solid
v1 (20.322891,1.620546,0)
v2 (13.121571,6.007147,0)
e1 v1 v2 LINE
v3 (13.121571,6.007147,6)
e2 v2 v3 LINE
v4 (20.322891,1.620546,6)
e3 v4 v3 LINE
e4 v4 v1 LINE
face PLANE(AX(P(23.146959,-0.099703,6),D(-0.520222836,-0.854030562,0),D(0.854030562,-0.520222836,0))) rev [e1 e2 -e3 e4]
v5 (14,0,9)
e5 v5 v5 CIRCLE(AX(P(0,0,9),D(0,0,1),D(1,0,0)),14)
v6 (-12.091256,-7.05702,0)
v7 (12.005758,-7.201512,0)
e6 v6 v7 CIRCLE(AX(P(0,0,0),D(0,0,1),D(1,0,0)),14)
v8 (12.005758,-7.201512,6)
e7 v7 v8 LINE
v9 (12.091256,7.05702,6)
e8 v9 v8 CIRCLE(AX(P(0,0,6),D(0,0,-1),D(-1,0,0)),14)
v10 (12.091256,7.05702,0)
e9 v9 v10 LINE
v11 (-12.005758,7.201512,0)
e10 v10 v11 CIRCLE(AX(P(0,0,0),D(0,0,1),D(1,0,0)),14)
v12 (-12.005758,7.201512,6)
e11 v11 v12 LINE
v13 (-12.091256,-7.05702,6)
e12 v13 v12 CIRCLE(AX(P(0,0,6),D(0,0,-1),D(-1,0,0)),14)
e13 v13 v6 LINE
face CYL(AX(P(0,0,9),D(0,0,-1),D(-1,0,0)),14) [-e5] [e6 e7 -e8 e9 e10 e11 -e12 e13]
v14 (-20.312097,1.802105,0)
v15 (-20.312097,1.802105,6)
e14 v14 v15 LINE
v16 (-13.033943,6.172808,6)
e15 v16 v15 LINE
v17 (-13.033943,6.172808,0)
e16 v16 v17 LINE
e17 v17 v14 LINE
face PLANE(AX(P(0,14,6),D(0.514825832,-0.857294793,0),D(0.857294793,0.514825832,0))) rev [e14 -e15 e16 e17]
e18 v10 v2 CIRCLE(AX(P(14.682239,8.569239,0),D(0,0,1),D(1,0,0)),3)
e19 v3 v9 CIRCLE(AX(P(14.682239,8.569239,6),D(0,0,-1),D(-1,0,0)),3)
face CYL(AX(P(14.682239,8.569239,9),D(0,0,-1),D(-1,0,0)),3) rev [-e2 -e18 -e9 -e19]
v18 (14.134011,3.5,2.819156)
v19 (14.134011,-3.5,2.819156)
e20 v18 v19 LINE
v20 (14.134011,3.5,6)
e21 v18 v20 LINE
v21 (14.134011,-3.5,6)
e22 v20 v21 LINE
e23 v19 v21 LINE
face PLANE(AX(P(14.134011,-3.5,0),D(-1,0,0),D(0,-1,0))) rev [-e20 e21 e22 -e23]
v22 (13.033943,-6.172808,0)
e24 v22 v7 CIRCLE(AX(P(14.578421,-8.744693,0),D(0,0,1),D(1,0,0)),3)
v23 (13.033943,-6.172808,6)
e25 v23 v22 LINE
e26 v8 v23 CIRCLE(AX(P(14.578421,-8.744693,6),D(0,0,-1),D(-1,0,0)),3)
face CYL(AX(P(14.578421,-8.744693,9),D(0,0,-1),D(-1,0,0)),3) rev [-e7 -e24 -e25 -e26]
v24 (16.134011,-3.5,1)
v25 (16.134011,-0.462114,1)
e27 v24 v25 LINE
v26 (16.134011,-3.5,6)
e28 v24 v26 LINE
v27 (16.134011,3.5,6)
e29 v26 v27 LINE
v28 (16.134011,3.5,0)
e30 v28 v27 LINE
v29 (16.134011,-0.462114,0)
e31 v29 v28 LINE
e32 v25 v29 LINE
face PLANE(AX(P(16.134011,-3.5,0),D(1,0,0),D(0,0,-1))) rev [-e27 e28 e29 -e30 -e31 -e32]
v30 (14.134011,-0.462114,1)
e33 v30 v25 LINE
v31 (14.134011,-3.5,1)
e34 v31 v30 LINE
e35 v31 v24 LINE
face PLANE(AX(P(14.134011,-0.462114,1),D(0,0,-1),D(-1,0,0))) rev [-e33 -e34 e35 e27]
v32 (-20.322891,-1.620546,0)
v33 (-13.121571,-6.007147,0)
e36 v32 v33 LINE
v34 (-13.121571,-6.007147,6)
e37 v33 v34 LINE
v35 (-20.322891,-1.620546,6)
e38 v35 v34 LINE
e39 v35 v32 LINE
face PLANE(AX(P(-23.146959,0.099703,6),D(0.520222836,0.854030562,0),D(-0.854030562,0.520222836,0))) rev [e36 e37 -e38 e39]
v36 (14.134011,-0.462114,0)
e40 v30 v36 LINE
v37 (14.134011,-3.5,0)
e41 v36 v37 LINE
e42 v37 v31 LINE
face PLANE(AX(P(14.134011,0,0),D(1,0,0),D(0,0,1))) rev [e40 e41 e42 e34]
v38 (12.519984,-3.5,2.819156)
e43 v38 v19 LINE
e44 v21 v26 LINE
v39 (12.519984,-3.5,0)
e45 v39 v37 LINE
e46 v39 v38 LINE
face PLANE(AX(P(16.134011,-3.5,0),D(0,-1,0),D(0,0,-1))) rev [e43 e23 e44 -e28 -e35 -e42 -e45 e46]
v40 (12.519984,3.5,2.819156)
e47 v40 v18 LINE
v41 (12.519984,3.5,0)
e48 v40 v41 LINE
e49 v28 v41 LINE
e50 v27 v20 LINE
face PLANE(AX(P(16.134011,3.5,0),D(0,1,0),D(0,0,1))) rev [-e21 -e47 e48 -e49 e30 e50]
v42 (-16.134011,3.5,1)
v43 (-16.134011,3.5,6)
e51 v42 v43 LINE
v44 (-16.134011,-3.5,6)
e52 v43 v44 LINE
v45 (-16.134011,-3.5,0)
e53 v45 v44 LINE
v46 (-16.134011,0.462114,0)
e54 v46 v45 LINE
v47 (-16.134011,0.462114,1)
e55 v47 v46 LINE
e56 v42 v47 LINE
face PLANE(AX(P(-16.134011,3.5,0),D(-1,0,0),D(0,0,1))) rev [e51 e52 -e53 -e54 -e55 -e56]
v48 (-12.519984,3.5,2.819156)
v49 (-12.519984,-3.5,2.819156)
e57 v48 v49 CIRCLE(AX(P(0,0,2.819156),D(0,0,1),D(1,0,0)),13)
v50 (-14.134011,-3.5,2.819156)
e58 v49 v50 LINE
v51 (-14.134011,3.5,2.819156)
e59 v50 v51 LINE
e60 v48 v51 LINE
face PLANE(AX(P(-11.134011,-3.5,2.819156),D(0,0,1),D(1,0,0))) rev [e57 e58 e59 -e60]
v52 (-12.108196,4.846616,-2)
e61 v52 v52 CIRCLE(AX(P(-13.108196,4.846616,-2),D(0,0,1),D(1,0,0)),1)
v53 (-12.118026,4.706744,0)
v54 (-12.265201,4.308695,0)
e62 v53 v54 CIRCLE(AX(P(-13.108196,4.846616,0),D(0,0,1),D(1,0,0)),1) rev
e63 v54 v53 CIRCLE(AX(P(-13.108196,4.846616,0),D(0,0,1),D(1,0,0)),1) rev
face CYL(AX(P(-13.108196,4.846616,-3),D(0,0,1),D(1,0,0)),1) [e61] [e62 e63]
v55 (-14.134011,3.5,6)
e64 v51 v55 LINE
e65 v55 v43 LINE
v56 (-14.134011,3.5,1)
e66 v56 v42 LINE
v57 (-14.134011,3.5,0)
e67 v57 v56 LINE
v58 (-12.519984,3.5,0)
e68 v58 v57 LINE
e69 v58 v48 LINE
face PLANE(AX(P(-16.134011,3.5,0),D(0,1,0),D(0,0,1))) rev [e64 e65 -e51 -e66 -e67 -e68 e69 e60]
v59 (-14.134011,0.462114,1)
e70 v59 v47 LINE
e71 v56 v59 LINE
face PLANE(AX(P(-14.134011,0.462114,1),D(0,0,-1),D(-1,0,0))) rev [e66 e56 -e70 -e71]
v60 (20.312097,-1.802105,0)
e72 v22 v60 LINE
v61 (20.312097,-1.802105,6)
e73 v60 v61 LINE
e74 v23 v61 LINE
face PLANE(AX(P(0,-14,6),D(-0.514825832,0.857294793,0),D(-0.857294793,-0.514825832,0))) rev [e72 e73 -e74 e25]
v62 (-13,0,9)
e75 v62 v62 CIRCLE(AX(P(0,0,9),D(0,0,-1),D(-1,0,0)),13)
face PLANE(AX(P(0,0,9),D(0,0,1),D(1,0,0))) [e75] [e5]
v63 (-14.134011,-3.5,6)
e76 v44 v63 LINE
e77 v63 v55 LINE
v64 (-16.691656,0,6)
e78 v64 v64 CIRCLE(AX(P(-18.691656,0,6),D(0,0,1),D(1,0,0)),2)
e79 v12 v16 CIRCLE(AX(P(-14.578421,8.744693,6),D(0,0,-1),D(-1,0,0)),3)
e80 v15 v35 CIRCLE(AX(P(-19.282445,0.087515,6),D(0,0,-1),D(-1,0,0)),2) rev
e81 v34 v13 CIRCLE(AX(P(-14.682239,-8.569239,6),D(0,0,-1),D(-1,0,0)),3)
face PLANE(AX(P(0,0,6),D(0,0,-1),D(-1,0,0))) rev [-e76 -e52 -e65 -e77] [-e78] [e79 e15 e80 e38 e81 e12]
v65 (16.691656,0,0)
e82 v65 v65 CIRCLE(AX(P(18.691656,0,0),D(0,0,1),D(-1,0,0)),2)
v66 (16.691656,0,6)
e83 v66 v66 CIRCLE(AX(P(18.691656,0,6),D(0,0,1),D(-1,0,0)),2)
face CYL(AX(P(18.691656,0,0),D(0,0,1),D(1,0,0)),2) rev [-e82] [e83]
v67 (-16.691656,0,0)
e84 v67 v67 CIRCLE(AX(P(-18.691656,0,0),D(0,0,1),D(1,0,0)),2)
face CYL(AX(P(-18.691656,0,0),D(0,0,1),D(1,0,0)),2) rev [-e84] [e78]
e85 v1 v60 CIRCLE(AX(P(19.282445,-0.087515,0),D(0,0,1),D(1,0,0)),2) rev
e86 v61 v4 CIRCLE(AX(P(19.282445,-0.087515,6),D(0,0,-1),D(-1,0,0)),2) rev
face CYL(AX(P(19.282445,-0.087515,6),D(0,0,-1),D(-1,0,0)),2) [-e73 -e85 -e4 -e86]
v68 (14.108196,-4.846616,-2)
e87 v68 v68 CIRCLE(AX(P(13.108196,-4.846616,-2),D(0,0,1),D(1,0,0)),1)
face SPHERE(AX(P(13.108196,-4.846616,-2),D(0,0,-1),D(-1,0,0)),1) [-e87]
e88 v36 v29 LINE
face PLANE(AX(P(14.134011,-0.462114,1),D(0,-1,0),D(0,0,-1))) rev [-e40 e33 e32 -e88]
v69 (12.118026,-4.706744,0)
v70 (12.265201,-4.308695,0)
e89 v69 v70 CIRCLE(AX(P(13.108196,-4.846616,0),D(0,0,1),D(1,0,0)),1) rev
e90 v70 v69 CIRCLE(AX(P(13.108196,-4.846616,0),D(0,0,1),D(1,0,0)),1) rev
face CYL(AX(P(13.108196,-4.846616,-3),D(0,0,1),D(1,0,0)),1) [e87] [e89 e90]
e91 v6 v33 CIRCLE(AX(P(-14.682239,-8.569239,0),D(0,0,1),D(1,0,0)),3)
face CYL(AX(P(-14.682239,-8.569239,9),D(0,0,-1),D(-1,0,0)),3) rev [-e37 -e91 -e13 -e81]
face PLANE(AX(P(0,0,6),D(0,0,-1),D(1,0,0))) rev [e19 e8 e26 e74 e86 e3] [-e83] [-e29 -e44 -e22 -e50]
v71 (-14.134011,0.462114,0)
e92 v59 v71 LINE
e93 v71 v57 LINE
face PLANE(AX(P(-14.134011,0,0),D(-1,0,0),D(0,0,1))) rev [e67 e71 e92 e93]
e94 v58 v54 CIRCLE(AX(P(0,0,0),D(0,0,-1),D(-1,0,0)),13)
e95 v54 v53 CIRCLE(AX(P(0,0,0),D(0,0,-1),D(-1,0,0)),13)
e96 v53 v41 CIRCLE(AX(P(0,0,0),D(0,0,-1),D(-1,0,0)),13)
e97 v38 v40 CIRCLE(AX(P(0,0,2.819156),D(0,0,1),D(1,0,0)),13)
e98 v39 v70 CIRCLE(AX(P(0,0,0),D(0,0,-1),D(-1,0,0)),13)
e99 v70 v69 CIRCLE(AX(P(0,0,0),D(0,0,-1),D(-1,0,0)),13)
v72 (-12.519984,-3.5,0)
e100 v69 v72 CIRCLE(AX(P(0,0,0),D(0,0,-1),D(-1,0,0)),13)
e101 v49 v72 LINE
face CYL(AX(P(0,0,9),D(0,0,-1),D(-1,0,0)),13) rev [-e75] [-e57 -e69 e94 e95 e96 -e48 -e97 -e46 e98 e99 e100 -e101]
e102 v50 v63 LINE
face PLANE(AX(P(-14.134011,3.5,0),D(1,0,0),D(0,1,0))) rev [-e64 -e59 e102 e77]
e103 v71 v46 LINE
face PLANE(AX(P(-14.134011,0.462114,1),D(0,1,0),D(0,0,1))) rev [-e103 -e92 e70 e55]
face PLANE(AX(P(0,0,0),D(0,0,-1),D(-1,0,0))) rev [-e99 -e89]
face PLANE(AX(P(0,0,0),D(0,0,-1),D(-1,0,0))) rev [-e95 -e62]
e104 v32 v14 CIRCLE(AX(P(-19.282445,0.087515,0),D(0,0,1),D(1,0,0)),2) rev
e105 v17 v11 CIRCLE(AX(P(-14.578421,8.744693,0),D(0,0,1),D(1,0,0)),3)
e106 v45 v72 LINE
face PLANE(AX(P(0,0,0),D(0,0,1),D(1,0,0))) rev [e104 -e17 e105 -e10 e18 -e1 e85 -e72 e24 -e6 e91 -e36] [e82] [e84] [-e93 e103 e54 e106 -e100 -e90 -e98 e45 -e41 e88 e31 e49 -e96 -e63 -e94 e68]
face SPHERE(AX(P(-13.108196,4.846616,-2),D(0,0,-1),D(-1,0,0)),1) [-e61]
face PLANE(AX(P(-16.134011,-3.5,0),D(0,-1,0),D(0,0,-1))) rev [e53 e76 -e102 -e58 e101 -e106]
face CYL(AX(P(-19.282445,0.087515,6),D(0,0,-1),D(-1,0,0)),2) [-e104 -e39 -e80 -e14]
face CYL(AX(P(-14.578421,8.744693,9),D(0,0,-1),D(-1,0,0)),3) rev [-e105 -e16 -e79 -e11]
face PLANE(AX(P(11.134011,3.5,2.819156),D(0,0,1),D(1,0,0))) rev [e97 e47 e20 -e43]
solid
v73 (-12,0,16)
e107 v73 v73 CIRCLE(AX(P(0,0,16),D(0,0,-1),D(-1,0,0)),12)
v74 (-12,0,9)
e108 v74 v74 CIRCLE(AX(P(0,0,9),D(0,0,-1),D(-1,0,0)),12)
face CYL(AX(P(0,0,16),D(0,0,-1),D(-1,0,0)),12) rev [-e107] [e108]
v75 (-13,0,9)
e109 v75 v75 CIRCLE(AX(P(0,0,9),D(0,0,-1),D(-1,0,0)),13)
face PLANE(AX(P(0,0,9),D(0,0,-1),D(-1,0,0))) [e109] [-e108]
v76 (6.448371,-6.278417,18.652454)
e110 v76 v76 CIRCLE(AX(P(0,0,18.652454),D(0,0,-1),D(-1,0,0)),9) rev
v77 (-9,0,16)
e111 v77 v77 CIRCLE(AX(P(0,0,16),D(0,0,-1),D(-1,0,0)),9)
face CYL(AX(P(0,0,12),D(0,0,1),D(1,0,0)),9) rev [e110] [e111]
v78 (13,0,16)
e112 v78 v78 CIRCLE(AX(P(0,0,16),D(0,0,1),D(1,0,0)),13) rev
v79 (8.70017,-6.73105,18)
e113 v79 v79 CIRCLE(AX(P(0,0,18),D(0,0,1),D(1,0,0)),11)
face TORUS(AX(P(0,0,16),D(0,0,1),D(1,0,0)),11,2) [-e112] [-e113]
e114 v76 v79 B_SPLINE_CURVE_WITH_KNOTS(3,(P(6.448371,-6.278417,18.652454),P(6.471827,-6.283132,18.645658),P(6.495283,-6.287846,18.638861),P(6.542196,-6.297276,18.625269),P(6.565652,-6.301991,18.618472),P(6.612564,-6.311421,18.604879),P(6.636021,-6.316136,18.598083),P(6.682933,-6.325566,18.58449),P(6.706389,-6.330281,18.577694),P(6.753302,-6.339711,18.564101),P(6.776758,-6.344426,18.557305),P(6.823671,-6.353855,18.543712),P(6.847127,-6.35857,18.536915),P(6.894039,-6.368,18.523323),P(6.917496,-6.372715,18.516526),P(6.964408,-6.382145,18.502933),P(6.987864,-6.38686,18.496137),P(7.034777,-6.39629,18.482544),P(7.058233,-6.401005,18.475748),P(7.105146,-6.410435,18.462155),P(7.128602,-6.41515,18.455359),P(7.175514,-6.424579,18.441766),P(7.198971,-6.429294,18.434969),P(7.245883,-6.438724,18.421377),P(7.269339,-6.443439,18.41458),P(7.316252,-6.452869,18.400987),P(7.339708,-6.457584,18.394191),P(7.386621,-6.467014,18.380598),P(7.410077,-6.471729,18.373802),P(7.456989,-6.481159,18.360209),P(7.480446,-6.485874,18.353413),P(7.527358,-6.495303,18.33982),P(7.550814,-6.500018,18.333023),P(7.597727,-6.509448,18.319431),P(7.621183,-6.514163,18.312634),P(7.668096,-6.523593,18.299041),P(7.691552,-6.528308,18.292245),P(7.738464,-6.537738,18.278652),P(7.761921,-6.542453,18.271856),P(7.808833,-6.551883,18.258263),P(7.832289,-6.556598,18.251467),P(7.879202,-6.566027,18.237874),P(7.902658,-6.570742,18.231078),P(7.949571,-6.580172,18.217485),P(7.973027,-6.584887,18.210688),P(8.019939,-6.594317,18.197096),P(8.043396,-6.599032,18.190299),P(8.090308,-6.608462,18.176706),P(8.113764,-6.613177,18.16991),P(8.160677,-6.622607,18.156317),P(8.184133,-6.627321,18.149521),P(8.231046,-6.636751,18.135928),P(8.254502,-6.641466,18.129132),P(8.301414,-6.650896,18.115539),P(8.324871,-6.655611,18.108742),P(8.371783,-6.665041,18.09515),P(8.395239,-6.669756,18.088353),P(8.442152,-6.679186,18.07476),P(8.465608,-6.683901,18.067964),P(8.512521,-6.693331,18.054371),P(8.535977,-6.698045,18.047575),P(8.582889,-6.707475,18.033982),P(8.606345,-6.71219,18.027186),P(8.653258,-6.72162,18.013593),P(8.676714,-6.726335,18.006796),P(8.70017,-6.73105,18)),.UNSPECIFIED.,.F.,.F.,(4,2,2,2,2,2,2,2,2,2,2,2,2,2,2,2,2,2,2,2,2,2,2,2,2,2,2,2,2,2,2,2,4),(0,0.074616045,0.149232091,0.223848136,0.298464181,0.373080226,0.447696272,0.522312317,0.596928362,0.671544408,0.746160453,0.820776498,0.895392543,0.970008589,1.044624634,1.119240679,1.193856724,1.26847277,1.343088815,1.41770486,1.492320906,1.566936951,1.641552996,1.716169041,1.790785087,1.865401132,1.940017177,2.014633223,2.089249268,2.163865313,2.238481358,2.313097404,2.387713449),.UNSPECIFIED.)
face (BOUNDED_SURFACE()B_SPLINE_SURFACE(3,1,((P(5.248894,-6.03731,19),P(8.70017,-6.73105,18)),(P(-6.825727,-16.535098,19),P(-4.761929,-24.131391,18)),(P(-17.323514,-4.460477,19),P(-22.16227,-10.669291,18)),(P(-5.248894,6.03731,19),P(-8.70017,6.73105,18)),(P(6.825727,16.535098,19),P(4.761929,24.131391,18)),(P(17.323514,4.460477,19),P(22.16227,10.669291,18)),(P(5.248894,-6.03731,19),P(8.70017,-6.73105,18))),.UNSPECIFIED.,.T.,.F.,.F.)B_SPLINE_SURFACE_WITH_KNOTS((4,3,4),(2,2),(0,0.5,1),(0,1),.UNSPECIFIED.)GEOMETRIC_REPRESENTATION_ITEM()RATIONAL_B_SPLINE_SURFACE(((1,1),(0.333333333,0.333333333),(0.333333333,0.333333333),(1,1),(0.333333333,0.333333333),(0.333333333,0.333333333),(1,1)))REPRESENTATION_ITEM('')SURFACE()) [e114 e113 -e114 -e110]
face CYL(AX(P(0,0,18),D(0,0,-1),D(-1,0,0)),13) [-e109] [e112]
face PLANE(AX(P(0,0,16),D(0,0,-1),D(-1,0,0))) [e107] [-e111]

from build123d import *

# Parameters (mm, degrees)
SKETCH1_R                = 14
BOSS_EXTRUDE1_DEPTH      = 9
SKETCH2_R                = 13
BOSS_EXTRUDE2_DEPTH      = 9
FILLET1_R                = 2
SKETCH3_R                = 8
BOSS_EXTRUDE4_DEPTH      = 1
BOSS_EXTRUDE5_DEPTH      = 6
SKETCH6_R                = 2
CUT_EXTRUDE1_DEPTH       = 6
FILLET2_R                = 2
SKETCH7_W                = 2
SKETCH7_H                = 7
CUT_EXTRUDE2_DEPTH       = 6
SKETCH9_R                = 1
BOSS_EXTRUDE7_DEPTH      = 3
FILLET5_R                = 1
FILLET6_R                = 3
SKETCH18_W               = 3.964192534
SKETCH18_H               = 7
CUT_EXTRUDE3_DEPTH       = 3
SKETCH19_W               = 1
SKETCH19_H               = 3.03788609
BOSS_EXTRUDE8_DEPTH      = 2
CIRPATTERN2_COUNT        = 2
FILLET2_OF_CIRPATTERN2_R = 2
FILLET5_OF_CIRPATTERN2_R = 1
FILLET6_OF_CIRPATTERN2_R = 3
SKETCH10_R               = 13
CUT_EXTRUDE4_DEPTH       = 9
SKETCH20_R               = 12
CUT_EXTRUDE6_DEPTH       = 7
SKETCH17_R               = 9
CUT_EXTRUDE7_DEPTH       = 7


with BuildPart() as part:
    # Sketch1 → Boss-Extrude1 (new body)
    with BuildSketch(Plane.XY):
        Circle(SKETCH1_R)
    extrude(amount=BOSS_EXTRUDE1_DEPTH)

    # Sketch2 → Boss-Extrude2 (add)
    with BuildSketch(Plane.XY.offset(9)):
        Circle(SKETCH2_R)
    extrude(amount=BOSS_EXTRUDE2_DEPTH)

    # Fillet1
    fillet1_edges = [part.edges().sort_by_distance(p)[0] for p in [
        (-13, 0, 18),
    ]]
    fillet(fillet1_edges, radius=FILLET1_R)

    # Sketch3 → Boss-Extrude4 (add)
    with BuildSketch(Plane.XY.offset(18)):
        Circle(SKETCH3_R)
    extrude(amount=BOSS_EXTRUDE4_DEPTH)

    # Loft2: read off the stored shape, not the designer's step
    # Loft2: loft between two sections, ruled curve by curve
    loft2_from = [
        Edge.make_bspline([(5.248893728, -6.037310215, 19), (-6.825726701, -16.535097672, 19), (-17.323514158, -4.460477242, 19), (-5.248893728, 6.037310215, 19), (6.825726701, 16.535097672, 19), (17.323514158, 4.460477242, 19), (5.248893728, -6.037310215, 19)], [0, 0, 0, 0, 0.5, 0.5, 0.5, 1, 1, 1, 1], 3, [1, 0.333333333, 0.333333333, 1, 0.333333333, 0.333333333, 1]),
    ]
    loft2_to = [
        Edge.make_bspline([(8.70017049, -6.731049951, 18), (-4.761929412, -24.131390931, 18), (-22.162270392, -10.669291029, 18), (-8.70017049, 6.731049951, 18), (4.761929412, 24.131390931, 18), (22.162270392, 10.669291029, 18), (8.70017049, -6.731049951, 18)], [0, 0, 0, 0, 0.5, 0.5, 0.5, 1, 1, 1, 1], 3, [1, 0.333333333, 0.333333333, 1, 0.333333333, 0.333333333, 1]),
    ]
    loft2 = Solid(Shell([*[Face.make_surface_from_curves(loft2_from[k], loft2_to[k]) for k in range(1)], Face(Wire(loft2_from)), Face(Wire(loft2_to))]))
    add(loft2)

    # Sketch5 → Boss-Extrude5 (add)
    with BuildSketch(Plane.XY):
        Polygon((0, 14), (-23.146959422, 0.099702538), (0, -14), align=None)
    boss_extrude5 = extrude(amount=BOSS_EXTRUDE5_DEPTH)

    # Sketch6 → Cut-Extrude1 (cut)
    with BuildSketch(Plane.XY.offset(6)):
        with Locations((-18.691655648, 0)):
            Circle(SKETCH6_R)
    cut_extrude1 = extrude(amount=-CUT_EXTRUDE1_DEPTH, mode=Mode.SUBTRACT)

    # Fillet2
    fillet2_edges = [part.edges().sort_by_distance(p)[0] for p in [
        (-23.146959422, 0.099702538, 3),
    ]]
    fillet(fillet2_edges, radius=FILLET2_R)

    # Sketch7 → Cut-Extrude2 (cut)
    with BuildSketch(Plane.XY.offset(6)):
        with Locations((-15.134010952, 0)):
            Rectangle(SKETCH7_W, SKETCH7_H)
    cut_extrude2 = extrude(amount=-CUT_EXTRUDE2_DEPTH, mode=Mode.SUBTRACT)

    # Sketch9 → Boss-Extrude7 (add)
    with BuildSketch(Plane(origin=(0, 0, 0), x_dir=(-1, 0, 0), z_dir=(0, 0, -1))):
        with Locations(Location((13.108195975, 4.846616093, 0), (0, 0, 180))):
            Circle(SKETCH9_R)
    boss_extrude7 = extrude(amount=BOSS_EXTRUDE7_DEPTH)

    # Fillet5
    fillet5_edges = [part.edges().sort_by_distance(p)[0] for p in [
        (-14.108195975, 4.846616093, -3),
    ]]
    fillet(fillet5_edges, radius=FILLET5_R)

    # Fillet6
    fillet6_edges = [part.edges().sort_by_distance(p)[0] for p in [
        (-12.358010146, 6.578722158, 3),
        (-12.440013632, -6.422309618, 3),
    ]]
    fillet(fillet6_edges, radius=FILLET6_R)

    # Sketch18 → Cut-Extrude3 (cut)
    with BuildSketch(Plane.ZY.offset(14.134010952)):
        with Locations((0.837060151, 0)):
            Rectangle(SKETCH18_W, SKETCH18_H)
    cut_extrude3 = extrude(amount=-CUT_EXTRUDE3_DEPTH, mode=Mode.SUBTRACT)

    # Sketch19 → Boss-Extrude8 (add)
    with BuildSketch(Plane(origin=(-16.134010952, 0, 0), x_dir=(0, 0, -1), z_dir=(1, 0, 0))):
        with Locations((-0.5, 1.981056955)):
            Rectangle(SKETCH19_W, SKETCH19_H)
    boss_extrude8 = extrude(amount=BOSS_EXTRUDE8_DEPTH)

    # CirPattern2: Boss-Extrude5, Cut-Extrude1, Cut-Extrude2, Boss-Extrude7, Cut-Extrude3, Boss-Extrude8 ×2 about axis
    cirpattern2_axis = Axis((0, 0, 0), (0, 0, 1))
    add([boss_extrude5.rotate(cirpattern2_axis, i * 360 / CIRPATTERN2_COUNT) for i in range(1, CIRPATTERN2_COUNT)])
    add([cut_extrude1.rotate(cirpattern2_axis, i * 360 / CIRPATTERN2_COUNT) for i in range(1, CIRPATTERN2_COUNT)], mode=Mode.SUBTRACT)
    add([cut_extrude2.rotate(cirpattern2_axis, i * 360 / CIRPATTERN2_COUNT) for i in range(1, CIRPATTERN2_COUNT)], mode=Mode.SUBTRACT)
    add([boss_extrude7.rotate(cirpattern2_axis, i * 360 / CIRPATTERN2_COUNT) for i in range(1, CIRPATTERN2_COUNT)])
    add([cut_extrude3.rotate(cirpattern2_axis, i * 360 / CIRPATTERN2_COUNT) for i in range(1, CIRPATTERN2_COUNT)], mode=Mode.SUBTRACT)
    add([boss_extrude8.rotate(cirpattern2_axis, i * 360 / CIRPATTERN2_COUNT) for i in range(1, CIRPATTERN2_COUNT)])

    # Fillet2 of CirPattern2
    fillet2_of_cirpattern2_edges = [part.edges().sort_by_distance(p)[0] for p in [
        (23.146959422, -0.099702538, 3),
    ]]
    fillet(fillet2_of_cirpattern2_edges, radius=FILLET2_OF_CIRPATTERN2_R)

    # Fillet5 of CirPattern2
    fillet5_of_cirpattern2_edges = [part.edges().sort_by_distance(p)[0] for p in [
        (14.108195975, -4.846616093, -3),
    ]]
    fillet(fillet5_of_cirpattern2_edges, radius=FILLET5_OF_CIRPATTERN2_R)

    # Fillet6 of CirPattern2
    fillet6_of_cirpattern2_edges = [part.edges().sort_by_distance(p)[0] for p in [
        (12.358010146, -6.578722158, 3),
        (12.440013632, 6.422309618, 3),
    ]]
    fillet(fillet6_of_cirpattern2_edges, radius=FILLET6_OF_CIRPATTERN2_R)

    # Sketch10 → Cut-Extrude4 (cut)
    with BuildSketch(Plane(origin=(0, 0, 0), x_dir=(-1, 0, 0), z_dir=(0, 0, -1))):
        Circle(SKETCH10_R)
    extrude(amount=-CUT_EXTRUDE4_DEPTH, mode=Mode.SUBTRACT)


with BuildPart() as cut_extrude4_piece_1:
    # of the separate pieces the step leaves, piece 1, a body of its own (cut_extrude4_pieces)
    add(part.part.solids().sort_by_distance((13, 0, 16))[0])

    # Sketch20 → Cut-Extrude6 (cut)
    with BuildSketch(Plane(origin=(0, 0, 9), x_dir=(-1, 0, 0), z_dir=(0, 0, -1))):
        Circle(SKETCH20_R)
    extrude(amount=-CUT_EXTRUDE6_DEPTH, mode=Mode.SUBTRACT)

    # Sketch17 → Cut-Extrude7 (cut)
    with BuildSketch(Plane.XY.offset(19)):
        with Locations(Location((0, 0, 0), (0, 0, 315.765085114))):
            Circle(SKETCH17_R)
    extrude(amount=-CUT_EXTRUDE7_DEPTH, mode=Mode.SUBTRACT)


with BuildPart() as cut_extrude4_piece_2:
    # of the separate pieces the step leaves, piece 2, a body of its own (cut_extrude4_pieces)
    add(part.part.solids().sort_by_distance((13.033943153, -6.172808375, 0))[0])


solid = Compound([cut_extrude4_piece_1.part, cut_extrude4_piece_2.part])
